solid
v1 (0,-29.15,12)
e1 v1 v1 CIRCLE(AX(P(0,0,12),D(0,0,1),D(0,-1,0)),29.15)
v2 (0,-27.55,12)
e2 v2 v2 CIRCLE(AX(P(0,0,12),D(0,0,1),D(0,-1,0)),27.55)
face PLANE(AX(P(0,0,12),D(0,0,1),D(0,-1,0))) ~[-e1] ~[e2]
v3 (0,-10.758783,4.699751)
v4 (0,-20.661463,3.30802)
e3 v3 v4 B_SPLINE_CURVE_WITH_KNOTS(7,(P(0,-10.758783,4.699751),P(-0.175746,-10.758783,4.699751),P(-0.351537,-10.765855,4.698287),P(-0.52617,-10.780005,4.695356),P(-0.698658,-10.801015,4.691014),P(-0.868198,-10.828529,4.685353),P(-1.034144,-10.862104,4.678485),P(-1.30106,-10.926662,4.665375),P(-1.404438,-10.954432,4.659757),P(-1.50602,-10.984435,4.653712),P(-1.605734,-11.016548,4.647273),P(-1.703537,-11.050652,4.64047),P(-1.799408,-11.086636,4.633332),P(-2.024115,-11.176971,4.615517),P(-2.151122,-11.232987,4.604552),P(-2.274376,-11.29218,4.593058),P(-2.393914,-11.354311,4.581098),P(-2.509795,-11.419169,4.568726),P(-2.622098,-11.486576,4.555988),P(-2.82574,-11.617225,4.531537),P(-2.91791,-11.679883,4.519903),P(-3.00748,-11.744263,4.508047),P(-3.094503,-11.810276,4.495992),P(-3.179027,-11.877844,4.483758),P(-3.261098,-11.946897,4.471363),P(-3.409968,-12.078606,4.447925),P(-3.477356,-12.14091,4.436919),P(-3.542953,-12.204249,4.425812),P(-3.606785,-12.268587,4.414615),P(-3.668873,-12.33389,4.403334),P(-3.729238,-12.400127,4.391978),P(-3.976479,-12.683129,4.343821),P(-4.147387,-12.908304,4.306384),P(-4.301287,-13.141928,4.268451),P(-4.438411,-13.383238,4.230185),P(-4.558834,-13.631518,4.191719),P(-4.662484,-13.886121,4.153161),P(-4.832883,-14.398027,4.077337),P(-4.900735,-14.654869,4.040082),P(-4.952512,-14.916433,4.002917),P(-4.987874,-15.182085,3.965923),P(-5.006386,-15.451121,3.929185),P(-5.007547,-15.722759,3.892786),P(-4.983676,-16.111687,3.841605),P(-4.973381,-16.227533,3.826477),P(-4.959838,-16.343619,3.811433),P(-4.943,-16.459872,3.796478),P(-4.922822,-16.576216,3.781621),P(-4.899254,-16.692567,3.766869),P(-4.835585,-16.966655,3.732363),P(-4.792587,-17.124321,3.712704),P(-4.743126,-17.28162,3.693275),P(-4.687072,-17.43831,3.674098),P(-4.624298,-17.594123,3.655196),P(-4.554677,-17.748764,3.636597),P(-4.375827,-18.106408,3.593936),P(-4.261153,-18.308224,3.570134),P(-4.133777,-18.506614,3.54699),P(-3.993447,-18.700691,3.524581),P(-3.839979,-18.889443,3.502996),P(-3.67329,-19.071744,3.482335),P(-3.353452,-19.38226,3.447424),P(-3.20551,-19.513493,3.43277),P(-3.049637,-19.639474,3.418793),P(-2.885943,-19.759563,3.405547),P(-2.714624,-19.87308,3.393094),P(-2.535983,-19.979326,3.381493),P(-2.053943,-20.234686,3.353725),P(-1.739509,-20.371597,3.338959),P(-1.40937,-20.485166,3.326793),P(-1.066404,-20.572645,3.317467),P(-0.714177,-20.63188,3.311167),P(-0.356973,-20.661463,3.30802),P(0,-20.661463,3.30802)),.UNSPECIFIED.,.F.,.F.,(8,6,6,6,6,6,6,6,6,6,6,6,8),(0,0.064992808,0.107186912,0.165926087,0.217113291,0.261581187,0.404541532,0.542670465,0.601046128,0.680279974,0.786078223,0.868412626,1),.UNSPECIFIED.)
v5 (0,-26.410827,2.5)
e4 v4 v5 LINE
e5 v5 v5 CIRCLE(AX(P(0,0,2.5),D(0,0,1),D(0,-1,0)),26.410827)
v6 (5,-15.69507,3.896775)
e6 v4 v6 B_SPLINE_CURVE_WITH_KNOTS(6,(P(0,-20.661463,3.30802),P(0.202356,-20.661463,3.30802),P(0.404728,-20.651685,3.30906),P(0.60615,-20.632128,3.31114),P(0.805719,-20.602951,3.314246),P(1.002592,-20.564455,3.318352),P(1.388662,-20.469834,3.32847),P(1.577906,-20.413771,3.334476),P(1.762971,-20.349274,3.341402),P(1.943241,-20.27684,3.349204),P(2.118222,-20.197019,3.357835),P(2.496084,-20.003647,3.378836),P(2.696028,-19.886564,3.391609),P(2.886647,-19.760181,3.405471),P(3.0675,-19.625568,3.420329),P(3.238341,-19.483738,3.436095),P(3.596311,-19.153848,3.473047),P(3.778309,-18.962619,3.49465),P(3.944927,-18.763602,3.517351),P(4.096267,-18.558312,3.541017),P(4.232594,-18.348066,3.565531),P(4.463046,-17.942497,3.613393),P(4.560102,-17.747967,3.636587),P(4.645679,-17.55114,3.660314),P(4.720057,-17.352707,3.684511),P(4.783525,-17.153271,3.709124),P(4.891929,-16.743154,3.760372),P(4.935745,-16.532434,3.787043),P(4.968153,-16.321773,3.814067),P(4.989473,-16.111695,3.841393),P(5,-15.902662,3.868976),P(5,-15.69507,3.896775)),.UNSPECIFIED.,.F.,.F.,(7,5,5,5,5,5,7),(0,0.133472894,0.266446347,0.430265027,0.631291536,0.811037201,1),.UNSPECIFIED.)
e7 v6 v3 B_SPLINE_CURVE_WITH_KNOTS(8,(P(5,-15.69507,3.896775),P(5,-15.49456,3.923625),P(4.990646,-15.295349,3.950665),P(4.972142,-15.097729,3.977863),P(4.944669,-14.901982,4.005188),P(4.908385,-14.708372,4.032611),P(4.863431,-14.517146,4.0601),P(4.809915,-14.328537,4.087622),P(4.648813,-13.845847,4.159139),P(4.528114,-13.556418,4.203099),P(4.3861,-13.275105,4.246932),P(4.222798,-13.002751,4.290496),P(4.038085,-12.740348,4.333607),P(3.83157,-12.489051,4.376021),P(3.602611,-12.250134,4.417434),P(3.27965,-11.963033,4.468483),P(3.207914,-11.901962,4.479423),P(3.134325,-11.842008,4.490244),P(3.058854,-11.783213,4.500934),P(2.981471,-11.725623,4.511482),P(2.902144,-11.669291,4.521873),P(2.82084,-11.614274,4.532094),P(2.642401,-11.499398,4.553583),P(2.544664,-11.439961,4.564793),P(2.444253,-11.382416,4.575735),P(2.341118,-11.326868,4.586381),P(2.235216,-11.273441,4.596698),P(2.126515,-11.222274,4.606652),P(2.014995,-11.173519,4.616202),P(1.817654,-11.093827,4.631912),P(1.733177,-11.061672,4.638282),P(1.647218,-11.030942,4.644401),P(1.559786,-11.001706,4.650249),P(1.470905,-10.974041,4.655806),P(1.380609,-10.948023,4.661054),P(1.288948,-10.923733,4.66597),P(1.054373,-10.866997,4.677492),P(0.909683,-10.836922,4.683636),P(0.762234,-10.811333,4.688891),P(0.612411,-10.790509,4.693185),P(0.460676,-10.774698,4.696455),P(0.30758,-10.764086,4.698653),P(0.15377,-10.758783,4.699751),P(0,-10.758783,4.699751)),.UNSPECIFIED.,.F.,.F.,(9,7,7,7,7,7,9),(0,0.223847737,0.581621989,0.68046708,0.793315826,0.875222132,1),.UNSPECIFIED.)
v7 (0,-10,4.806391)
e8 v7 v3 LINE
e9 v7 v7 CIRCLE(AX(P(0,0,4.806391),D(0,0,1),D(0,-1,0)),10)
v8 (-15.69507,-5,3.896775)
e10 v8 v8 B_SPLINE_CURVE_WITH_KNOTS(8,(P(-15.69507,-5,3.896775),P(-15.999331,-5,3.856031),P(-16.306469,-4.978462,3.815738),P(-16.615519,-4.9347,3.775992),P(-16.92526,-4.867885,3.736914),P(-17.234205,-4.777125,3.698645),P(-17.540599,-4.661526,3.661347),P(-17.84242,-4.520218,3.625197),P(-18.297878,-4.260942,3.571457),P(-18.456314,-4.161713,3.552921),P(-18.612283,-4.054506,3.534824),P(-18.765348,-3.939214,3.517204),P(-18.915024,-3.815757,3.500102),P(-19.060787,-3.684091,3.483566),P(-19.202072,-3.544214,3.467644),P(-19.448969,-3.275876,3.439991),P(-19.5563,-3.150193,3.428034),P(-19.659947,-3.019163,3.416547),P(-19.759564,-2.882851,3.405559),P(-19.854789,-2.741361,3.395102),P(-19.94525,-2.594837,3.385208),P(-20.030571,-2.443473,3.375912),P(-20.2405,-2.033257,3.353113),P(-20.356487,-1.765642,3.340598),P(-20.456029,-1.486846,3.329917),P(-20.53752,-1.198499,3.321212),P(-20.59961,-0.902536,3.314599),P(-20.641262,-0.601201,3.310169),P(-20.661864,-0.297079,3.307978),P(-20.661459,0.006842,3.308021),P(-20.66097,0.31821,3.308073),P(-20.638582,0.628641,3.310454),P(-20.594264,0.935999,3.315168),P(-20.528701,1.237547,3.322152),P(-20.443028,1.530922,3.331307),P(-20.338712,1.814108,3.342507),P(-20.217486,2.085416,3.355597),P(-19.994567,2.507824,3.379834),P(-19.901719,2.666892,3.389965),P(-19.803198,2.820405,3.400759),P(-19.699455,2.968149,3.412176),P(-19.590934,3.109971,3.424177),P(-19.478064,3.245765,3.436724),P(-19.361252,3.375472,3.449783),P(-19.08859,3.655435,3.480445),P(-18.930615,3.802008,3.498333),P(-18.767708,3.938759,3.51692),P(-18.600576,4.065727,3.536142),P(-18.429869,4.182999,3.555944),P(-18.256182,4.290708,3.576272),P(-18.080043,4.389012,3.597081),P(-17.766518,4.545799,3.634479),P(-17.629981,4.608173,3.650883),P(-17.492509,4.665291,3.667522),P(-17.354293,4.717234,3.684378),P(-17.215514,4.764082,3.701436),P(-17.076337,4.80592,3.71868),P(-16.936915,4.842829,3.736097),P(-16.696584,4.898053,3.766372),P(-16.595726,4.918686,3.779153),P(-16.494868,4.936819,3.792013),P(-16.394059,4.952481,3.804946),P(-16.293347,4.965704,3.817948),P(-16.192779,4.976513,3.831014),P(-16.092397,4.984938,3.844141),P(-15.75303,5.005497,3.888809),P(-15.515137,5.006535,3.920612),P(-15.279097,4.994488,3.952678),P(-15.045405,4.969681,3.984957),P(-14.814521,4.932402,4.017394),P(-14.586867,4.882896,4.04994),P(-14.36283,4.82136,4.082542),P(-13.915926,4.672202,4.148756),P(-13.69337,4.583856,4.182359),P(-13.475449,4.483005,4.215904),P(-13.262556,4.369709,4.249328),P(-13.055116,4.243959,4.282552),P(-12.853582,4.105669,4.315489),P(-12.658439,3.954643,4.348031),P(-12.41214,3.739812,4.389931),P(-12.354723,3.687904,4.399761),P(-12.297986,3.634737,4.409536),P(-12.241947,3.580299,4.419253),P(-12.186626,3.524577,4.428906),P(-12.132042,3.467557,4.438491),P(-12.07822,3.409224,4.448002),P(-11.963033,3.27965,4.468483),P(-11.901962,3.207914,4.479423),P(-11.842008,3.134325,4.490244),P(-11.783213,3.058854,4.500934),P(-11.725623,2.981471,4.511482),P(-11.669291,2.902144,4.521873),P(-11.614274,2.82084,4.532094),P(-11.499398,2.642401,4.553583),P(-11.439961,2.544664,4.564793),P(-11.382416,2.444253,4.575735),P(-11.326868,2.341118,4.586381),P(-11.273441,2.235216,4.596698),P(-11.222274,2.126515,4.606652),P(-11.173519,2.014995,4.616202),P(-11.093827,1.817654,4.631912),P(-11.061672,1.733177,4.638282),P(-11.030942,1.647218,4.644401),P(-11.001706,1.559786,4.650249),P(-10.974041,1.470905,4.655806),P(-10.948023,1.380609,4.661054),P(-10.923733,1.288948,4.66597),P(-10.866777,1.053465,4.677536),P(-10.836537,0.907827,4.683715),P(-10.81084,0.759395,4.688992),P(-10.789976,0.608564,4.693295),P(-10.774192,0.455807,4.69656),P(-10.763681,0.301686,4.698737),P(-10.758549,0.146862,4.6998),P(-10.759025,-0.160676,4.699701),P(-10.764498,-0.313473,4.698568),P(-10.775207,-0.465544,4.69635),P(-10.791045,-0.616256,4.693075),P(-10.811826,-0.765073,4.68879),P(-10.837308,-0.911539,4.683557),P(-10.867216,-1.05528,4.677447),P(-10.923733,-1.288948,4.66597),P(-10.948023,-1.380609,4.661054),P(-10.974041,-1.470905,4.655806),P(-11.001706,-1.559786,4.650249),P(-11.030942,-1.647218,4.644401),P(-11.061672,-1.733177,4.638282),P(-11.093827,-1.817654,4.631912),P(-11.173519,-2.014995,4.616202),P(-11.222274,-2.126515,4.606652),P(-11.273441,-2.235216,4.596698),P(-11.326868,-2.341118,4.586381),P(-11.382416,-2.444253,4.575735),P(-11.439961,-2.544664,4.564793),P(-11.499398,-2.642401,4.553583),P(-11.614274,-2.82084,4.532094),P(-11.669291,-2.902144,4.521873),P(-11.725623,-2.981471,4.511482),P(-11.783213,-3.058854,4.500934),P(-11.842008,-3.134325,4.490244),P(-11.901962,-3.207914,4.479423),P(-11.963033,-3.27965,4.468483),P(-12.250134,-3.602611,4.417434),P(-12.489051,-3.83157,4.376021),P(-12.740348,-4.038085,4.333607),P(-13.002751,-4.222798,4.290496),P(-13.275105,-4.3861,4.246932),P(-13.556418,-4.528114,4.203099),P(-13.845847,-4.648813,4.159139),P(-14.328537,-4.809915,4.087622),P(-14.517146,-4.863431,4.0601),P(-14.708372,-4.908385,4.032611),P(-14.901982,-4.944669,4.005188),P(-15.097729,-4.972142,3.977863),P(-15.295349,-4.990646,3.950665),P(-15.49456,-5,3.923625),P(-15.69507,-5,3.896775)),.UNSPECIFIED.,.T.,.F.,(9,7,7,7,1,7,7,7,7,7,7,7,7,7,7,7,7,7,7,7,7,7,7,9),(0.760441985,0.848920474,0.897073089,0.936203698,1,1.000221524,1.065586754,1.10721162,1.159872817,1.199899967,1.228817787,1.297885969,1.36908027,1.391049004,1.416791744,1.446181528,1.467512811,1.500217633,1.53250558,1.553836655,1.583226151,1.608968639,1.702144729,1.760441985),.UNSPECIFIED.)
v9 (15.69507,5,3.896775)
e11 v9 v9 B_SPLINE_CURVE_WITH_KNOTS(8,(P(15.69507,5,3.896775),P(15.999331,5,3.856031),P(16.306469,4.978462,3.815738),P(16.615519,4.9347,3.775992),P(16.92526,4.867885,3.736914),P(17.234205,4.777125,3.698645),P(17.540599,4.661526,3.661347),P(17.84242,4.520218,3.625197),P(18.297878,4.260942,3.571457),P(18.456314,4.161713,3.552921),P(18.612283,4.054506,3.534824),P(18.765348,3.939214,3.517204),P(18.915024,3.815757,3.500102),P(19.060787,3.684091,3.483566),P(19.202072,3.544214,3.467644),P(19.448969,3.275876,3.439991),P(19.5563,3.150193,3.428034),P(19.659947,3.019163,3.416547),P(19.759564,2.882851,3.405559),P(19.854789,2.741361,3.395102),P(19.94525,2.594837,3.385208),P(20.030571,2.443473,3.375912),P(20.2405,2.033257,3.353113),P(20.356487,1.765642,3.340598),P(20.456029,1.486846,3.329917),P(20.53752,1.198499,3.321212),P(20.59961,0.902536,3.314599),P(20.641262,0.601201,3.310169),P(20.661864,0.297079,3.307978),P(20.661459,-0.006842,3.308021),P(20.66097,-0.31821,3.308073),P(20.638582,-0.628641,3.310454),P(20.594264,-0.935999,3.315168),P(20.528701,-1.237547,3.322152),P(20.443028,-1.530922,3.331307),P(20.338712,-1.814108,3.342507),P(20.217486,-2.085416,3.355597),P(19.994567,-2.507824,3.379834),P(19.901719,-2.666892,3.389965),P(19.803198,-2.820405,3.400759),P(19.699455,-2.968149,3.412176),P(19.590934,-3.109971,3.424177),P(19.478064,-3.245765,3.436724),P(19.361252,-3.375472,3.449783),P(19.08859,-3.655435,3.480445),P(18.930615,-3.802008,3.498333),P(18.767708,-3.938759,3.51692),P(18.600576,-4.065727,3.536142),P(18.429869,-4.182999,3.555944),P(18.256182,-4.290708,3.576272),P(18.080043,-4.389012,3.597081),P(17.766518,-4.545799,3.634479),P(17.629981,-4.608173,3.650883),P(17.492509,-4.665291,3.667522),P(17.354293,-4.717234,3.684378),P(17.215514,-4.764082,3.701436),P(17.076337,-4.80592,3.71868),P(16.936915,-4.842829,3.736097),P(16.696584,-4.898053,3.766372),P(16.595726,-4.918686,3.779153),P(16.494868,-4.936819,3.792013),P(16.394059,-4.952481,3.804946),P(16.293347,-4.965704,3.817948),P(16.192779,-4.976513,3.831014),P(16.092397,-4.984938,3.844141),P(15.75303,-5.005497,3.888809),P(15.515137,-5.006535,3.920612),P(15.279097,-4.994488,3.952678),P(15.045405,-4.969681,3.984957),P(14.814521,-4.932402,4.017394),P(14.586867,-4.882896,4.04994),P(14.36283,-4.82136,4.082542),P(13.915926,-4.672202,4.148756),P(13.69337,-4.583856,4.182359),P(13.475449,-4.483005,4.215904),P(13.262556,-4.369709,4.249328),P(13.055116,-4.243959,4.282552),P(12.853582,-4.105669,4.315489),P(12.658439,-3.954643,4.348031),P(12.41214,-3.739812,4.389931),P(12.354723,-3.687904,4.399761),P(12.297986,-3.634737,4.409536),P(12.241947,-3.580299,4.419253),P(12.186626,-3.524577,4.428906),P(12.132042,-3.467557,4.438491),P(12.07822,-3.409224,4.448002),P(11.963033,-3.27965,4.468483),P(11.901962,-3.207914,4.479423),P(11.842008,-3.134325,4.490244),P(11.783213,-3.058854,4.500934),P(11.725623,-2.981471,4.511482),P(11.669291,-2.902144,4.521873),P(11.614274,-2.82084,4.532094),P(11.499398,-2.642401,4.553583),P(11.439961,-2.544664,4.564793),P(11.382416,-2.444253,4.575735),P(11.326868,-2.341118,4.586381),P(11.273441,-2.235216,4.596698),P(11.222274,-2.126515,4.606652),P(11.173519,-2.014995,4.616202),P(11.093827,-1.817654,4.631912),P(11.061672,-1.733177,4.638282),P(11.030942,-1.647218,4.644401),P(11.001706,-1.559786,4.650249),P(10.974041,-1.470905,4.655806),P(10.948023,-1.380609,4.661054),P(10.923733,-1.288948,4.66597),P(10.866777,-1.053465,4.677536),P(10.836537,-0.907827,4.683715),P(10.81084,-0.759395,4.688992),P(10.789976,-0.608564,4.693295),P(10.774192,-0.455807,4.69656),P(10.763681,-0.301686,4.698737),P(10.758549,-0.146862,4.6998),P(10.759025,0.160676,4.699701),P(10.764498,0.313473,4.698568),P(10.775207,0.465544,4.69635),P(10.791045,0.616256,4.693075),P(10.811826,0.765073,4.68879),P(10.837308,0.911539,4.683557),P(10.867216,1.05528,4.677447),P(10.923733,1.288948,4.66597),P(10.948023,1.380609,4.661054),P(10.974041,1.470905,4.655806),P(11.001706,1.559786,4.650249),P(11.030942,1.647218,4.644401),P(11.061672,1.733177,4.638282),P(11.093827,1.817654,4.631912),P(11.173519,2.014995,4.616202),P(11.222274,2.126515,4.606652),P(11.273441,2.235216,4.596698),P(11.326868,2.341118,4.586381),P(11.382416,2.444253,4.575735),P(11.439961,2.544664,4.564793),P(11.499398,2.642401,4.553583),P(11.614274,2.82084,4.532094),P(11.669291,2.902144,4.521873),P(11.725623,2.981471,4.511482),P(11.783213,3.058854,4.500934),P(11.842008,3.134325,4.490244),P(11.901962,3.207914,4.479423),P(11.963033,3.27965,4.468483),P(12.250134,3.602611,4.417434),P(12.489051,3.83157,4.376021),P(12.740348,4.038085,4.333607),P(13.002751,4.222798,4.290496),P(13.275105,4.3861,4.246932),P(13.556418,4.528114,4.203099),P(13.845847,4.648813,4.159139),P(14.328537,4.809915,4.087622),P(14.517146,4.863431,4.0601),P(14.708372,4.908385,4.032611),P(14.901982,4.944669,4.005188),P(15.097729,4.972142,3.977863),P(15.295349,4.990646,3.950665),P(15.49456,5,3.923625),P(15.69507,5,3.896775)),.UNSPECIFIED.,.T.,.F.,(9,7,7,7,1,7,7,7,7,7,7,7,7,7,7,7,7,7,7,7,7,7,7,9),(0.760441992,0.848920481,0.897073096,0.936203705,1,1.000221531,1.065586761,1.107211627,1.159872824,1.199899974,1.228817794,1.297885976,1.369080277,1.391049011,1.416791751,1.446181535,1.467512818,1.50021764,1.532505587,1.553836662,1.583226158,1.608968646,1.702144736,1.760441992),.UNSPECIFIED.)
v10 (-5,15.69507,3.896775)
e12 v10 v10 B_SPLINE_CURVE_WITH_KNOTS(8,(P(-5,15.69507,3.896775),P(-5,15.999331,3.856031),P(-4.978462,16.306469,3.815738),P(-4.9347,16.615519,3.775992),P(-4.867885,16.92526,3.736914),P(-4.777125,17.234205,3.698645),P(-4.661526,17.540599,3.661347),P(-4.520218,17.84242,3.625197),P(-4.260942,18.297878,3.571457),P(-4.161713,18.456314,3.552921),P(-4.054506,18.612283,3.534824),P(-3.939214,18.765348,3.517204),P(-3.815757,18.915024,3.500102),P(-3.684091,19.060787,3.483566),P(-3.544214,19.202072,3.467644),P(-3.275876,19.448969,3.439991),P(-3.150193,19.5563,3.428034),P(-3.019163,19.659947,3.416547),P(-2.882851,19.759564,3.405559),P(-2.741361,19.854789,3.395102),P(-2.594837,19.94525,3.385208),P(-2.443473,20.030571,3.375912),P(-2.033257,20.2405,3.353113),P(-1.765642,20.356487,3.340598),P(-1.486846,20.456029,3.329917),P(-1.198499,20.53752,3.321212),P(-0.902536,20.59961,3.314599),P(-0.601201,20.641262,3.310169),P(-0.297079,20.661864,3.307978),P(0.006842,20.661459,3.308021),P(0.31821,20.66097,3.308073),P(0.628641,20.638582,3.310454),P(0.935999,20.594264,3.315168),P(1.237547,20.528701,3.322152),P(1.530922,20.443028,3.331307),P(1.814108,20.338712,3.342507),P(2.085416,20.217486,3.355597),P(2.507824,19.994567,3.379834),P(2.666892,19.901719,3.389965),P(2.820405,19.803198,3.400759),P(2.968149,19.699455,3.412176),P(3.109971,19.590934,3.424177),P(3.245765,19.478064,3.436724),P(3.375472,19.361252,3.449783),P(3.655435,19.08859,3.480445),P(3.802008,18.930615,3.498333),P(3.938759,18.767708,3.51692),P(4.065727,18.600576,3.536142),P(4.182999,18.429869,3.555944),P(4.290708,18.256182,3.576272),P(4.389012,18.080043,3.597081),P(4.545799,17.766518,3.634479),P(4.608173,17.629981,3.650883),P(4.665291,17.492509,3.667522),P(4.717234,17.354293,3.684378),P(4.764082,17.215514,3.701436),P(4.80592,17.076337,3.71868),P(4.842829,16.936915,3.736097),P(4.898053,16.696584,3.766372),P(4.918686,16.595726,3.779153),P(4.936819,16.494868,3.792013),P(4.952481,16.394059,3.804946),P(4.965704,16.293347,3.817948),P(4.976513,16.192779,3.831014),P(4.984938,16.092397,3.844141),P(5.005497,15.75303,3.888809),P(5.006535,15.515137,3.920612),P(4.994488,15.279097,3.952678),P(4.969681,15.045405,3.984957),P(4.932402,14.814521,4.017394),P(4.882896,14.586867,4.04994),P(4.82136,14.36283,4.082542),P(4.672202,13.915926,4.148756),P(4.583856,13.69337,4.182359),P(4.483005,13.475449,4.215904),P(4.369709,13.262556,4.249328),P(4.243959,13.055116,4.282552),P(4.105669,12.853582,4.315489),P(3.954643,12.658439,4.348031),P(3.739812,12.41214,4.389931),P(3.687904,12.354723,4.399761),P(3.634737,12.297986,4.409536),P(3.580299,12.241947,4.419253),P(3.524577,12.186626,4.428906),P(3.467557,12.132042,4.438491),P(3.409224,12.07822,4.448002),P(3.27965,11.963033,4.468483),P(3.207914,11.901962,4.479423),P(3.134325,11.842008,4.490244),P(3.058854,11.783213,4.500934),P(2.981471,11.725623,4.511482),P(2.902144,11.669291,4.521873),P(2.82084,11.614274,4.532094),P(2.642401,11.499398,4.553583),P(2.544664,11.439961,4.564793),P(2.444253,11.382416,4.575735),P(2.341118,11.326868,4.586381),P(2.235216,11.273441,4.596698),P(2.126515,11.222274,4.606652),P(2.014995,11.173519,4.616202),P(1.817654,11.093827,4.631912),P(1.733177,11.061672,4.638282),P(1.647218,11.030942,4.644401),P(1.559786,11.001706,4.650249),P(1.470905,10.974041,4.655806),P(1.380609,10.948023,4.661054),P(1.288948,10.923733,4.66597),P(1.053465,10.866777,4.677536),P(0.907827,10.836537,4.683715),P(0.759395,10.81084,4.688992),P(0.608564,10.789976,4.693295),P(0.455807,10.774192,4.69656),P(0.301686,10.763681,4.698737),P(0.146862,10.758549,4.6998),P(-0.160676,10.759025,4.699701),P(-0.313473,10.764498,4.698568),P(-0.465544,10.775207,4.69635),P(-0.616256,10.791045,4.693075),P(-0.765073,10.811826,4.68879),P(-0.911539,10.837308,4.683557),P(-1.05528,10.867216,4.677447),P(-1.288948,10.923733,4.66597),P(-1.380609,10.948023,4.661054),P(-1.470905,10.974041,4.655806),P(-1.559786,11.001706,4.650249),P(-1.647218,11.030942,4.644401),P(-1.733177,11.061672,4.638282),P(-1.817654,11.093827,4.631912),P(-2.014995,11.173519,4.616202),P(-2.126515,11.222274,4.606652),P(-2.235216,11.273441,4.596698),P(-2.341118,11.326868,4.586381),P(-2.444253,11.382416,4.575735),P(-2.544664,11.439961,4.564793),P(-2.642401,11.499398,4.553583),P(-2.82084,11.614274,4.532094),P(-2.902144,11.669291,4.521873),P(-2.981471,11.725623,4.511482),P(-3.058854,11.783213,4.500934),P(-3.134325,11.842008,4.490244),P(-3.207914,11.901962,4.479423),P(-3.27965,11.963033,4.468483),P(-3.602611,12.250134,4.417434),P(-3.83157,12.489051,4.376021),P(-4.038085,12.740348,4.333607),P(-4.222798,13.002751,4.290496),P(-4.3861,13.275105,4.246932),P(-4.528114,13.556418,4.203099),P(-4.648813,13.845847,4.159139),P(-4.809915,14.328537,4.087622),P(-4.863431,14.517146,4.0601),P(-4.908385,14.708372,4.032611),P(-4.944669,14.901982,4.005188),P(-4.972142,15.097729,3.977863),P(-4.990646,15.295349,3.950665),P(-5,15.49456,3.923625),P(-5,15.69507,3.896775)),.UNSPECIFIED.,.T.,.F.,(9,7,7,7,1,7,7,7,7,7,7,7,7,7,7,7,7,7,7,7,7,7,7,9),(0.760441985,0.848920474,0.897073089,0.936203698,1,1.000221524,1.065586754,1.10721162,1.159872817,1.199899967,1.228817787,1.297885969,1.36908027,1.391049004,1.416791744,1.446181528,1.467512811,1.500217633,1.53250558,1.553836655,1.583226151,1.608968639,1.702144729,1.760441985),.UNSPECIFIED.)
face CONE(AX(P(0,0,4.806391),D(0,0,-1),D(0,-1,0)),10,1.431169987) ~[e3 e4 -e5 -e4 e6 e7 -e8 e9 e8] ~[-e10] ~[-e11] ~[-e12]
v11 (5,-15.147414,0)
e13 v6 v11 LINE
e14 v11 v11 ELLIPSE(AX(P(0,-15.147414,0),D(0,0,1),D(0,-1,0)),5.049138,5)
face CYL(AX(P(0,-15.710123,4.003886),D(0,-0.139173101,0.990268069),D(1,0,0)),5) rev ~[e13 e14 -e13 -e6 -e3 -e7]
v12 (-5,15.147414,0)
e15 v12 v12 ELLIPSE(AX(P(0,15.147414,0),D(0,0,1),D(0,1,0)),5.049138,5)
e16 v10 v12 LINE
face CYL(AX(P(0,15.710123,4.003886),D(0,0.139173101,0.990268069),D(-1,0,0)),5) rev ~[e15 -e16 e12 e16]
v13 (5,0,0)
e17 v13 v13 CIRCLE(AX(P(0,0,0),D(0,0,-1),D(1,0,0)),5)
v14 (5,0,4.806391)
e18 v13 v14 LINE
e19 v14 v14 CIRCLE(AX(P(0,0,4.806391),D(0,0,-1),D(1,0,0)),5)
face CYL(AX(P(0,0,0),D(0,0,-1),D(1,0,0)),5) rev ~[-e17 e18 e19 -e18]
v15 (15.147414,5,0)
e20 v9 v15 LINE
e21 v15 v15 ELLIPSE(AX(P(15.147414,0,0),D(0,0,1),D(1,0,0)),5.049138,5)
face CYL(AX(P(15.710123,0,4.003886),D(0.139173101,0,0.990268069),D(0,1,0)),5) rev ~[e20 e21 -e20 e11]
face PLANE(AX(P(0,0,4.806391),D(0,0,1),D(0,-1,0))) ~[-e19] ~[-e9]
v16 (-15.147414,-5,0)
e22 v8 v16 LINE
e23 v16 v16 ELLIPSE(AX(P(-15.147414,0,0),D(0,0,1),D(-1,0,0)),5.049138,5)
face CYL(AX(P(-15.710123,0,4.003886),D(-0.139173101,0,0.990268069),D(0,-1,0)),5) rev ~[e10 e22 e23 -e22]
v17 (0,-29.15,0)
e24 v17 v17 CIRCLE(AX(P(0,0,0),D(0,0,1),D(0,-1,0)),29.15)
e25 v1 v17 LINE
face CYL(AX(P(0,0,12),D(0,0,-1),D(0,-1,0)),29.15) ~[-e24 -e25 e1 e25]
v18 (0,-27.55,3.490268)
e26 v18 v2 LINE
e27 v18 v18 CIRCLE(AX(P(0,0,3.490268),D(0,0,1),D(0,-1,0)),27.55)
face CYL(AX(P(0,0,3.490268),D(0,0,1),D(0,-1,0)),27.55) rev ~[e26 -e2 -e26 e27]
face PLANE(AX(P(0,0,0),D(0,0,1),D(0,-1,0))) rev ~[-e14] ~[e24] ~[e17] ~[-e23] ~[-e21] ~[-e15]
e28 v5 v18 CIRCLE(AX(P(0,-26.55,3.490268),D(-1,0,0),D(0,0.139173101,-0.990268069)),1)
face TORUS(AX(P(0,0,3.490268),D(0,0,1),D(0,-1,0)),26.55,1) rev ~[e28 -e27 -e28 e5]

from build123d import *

# Parameters (mm, degrees)
F2_R            = 5
F3_DEPTH        = 4.8063913105
F5_R            = 5
F6_DEPTH        = 4.7469386033
F6_COPIES_COUNT = 4


# Not quite as in the source:
# - a pattern or mirror of a feature is missing from the dataset's text; its kind, count and spacing are read off the source's solid


with BuildPart() as f1:
    # F0 (on Right) → F1 (revolve)
    with BuildSketch(Plane.YZ):
        with BuildLine():
            Line((0, 0), (0, 4.8063913105))
            Line((0, 4.8063913105), (-10, 4.8063913105))
            Line((-10, 4.8063913105), (-26.410826899, 2.5))
            ThreePointArc((-26.410826899, 2.5), (-27.206059029, 2.7355584885), (-27.55, 3.4902680687))
            Line((-27.55, 3.4902680687), (-27.55, 12))
            Line((-27.55, 12), (-29.15, 12))
            Line((-29.15, 12), (-29.15, 0))
            Line((-29.15, 0), (0, 0))
        make_face()
    revolve(axis=Axis((0, 0, 11.0792994889), (0, 0, 1)))

    # F2 (on face) → F3 (cut, through all)
    with BuildSketch(Plane(origin=(0, 0, 0), x_dir=(1, 0, 0), z_dir=(0, 0, -1))):
        Circle(F2_R)
    extrude(amount=-F3_DEPTH, mode=Mode.SUBTRACT)

    # F5 (on line) → F6 (cut, through all)
    with BuildSketch(Plane(origin=(0, -0.8561020162, 6.0914823656), x_dir=(1, 0, 0), z_dir=(0, -0.139173101, 0.9902680687))):
        with Locations((0, -15)):
            Circle(F5_R)
    f6 = extrude(amount=-F6_DEPTH, mode=Mode.SUBTRACT)

    # F6_copies: F6 ×4 about axis
    f6_copies_axis = Axis((0, 0, 0), (0, 0, 1))
    for i in range(1, F6_COPIES_COUNT):
        add(f6.rotate(f6_copies_axis, i * 360 / F6_COPIES_COUNT), mode=Mode.SUBTRACT)


solid = f1.part
